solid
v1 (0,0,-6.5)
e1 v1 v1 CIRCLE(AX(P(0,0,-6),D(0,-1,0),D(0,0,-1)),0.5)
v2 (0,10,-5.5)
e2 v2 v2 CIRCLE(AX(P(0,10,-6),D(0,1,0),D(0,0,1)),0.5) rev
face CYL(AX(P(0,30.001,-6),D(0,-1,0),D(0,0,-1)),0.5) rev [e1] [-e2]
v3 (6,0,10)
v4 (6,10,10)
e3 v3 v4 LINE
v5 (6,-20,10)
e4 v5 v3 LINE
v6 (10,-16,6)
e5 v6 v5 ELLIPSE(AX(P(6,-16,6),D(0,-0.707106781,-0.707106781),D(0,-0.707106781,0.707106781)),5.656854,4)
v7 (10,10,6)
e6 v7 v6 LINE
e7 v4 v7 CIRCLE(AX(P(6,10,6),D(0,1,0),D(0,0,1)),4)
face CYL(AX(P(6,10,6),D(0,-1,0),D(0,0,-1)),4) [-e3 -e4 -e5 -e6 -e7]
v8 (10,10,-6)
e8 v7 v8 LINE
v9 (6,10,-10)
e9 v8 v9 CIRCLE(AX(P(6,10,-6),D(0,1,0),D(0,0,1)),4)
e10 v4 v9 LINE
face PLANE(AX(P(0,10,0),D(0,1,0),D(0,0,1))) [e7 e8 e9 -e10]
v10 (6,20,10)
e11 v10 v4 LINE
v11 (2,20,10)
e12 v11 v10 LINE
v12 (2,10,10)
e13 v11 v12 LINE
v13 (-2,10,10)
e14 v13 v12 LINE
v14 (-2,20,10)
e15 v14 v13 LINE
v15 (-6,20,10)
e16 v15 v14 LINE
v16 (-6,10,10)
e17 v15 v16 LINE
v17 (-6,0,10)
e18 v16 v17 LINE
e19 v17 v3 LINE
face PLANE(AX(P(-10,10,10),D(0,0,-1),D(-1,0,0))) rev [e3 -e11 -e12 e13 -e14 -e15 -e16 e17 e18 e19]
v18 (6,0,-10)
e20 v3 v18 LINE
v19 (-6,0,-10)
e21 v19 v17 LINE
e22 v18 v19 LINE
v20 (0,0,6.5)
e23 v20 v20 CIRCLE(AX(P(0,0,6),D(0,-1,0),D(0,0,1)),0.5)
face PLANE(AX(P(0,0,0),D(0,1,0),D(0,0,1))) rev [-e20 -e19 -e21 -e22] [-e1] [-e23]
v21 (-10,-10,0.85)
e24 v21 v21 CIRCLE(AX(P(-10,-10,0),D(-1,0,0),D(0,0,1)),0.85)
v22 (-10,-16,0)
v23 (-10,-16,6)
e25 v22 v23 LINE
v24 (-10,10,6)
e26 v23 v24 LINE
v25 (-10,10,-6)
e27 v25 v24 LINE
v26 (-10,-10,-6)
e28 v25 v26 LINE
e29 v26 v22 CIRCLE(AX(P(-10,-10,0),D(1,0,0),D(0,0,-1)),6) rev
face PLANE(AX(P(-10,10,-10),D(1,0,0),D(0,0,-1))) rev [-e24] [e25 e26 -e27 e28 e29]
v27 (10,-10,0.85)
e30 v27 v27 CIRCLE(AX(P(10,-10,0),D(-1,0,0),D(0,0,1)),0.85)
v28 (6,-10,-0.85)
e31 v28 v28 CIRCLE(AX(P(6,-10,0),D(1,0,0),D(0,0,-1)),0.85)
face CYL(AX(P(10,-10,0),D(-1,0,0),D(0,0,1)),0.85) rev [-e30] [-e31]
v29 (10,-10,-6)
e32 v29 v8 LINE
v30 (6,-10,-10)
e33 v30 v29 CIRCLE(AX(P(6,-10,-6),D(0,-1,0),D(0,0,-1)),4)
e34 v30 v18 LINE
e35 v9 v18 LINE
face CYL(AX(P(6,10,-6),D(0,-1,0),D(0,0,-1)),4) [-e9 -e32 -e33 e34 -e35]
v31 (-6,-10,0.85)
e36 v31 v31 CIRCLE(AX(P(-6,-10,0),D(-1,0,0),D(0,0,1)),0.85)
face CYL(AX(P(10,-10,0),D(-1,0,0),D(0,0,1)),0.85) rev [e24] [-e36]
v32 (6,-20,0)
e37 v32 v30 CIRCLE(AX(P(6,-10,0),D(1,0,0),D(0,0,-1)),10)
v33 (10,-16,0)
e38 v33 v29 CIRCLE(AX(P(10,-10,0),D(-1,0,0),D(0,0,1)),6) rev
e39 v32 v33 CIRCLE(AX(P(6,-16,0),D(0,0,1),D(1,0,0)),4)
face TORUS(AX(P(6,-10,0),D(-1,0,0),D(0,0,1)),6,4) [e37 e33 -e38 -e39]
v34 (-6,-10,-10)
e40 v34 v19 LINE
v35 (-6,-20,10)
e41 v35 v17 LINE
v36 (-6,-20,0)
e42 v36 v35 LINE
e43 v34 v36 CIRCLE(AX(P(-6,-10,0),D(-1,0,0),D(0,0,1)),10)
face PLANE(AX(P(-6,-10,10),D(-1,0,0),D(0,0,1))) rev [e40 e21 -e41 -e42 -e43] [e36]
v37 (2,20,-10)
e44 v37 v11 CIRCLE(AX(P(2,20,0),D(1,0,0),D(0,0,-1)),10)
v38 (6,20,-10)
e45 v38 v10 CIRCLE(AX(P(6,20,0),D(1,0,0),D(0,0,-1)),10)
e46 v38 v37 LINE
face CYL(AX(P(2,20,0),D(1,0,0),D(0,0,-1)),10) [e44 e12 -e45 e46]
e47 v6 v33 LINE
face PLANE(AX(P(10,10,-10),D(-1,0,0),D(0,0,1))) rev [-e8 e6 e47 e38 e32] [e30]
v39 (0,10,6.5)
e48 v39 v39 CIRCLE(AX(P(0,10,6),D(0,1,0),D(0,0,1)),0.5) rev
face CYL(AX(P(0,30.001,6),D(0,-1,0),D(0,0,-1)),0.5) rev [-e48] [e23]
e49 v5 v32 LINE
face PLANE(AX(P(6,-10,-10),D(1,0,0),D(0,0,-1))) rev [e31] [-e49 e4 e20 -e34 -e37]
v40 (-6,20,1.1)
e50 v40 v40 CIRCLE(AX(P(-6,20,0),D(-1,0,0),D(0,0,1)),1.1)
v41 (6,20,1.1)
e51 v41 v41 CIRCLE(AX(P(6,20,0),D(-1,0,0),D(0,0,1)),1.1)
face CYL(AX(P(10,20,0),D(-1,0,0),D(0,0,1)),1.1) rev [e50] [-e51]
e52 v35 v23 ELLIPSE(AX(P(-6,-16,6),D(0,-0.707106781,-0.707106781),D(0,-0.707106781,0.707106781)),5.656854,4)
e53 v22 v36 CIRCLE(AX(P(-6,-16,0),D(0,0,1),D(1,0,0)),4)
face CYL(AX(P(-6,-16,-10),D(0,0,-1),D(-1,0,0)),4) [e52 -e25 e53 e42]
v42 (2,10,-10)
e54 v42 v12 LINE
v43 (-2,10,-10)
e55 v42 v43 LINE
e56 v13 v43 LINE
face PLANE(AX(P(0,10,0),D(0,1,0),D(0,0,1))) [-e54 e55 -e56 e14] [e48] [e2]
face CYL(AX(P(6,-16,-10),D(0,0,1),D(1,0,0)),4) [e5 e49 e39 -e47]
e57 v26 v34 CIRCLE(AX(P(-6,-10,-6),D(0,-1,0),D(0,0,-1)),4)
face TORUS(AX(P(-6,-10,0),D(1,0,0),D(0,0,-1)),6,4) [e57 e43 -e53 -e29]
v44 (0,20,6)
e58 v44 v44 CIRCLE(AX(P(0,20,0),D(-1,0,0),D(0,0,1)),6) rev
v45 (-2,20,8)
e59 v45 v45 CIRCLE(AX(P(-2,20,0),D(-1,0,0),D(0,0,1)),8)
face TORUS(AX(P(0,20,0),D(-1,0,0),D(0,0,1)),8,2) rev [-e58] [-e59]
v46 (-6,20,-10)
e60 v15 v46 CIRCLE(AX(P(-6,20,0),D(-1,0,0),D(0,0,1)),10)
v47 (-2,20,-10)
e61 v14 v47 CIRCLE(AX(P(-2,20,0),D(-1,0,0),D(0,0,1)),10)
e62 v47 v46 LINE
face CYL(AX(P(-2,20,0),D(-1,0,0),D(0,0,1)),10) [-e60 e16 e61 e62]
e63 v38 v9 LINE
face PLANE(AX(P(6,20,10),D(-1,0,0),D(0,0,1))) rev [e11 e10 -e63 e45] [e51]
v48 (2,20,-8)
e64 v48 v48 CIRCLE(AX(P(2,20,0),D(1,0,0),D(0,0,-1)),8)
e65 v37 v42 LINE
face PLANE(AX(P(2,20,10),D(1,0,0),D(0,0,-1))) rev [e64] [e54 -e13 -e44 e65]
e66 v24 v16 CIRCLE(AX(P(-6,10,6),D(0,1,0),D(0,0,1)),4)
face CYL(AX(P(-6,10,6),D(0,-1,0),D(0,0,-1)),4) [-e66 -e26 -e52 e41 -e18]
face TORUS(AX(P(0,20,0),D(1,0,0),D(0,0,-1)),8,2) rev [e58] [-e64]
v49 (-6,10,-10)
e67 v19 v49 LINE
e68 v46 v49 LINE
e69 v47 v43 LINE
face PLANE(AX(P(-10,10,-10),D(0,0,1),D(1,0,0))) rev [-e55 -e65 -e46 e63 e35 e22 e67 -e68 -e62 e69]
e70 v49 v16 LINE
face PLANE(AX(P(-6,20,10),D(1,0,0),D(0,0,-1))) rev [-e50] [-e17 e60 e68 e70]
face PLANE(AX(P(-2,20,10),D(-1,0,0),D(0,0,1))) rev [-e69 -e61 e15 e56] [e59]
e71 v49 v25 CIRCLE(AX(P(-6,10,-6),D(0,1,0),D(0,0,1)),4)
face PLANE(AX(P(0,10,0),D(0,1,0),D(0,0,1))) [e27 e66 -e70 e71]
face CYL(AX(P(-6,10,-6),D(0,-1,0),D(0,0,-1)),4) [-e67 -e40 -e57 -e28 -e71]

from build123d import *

# Parameters (mm, degrees)
SKETCH1_W           = 20
SKETCH1_H           = 20
BOSS_EXTRUDE1_DEPTH = 10
SKETCH4_W           = 4
SKETCH4_H           = 20
BOSS_EXTRUDE2_DEPTH = 10
BOSS_EXTRUDE3_DEPTH = 4
BOSS_EXTRUDE4_START = -4
BOSS_EXTRUDE4_DEPTH = 4
SKETCH7_R           = 0.85
CUT_EXTRUDE1_DEPTH  = 31
FILLET1_R           = 4
SKETCH8_W           = 4
SKETCH8_H           = 20
BOSS_EXTRUDE5_DEPTH = 10
SKETCH9_R           = 10
BOSS_EXTRUDE6_DEPTH = 4
BOSS_EXTRUDE7_START = -4
SKETCH10_R          = 10
BOSS_EXTRUDE7_DEPTH = 4
SKETCH12_R          = 1.1
CUT_EXTRUDE2_DEPTH  = 36.440090293
SKETCH13_R          = 6
BOSS_EXTRUDE8_DEPTH = 4
SKETCH14_R          = 1.1
CUT_EXTRUDE3_DEPTH  = 4
FILLET2_R           = 2
CUT_EXTRUDE4_REACH  = 35.166
SKETCH16_R          = 0.5


with BuildPart() as part:
    # Sketch1 → Boss-Extrude1 (new body)
    with BuildSketch(Plane(origin=(0, 0, 0), x_dir=(1, 0, 0), z_dir=(0, 1, 0))):
        Rectangle(SKETCH1_W, SKETCH1_H)
    extrude(amount=BOSS_EXTRUDE1_DEPTH)

    # Sketch4 → Boss-Extrude2 (add)
    with BuildSketch(Plane.XZ):
        with Locations((-8, 0)):
            Rectangle(SKETCH4_W, SKETCH4_H)
        with Locations((8, 0)):
            Rectangle(SKETCH4_W, SKETCH4_H)
    extrude(amount=BOSS_EXTRUDE2_DEPTH)

    # Sketch5 → Boss-Extrude3 (add)
    with BuildSketch(Plane.ZY.offset(10)):
        with BuildLine():
            Line((0, -20), (10, -20))
            Line((10, -20), (10, -10))
            ThreePointArc((10, -10), (-7.071067812, -2.928932188), (0, -20))
        make_face()
    extrude(amount=-BOSS_EXTRUDE3_DEPTH)

    # Sketch6 → Boss-Extrude4 (add)
    with BuildSketch(Plane(origin=(10, 0, 0), x_dir=(0, 0, -1), z_dir=(1, 0, 0)).offset(BOSS_EXTRUDE4_START)):
        with BuildLine():
            Line((0, -20), (-10, -20))
            Line((-10, -20), (-10, -10))
            ThreePointArc((-10, -10), (7.071067812, -2.928932188), (0, -20))
        make_face()
    extrude(amount=BOSS_EXTRUDE4_DEPTH)

    # Sketch7 → Cut-Extrude1 (cut, through all)
    with BuildSketch(Plane.ZY.offset(10)):
        with Locations((0, -10)):
            Circle(SKETCH7_R)
    extrude(amount=-CUT_EXTRUDE1_DEPTH, mode=Mode.SUBTRACT)

    # Fillet1
    fillet1_edges = [part.edges().sort_by_distance(p)[0] for p in [
        (-10, -5, 10),
        (-10, -17.071067812, -7.071067812),
        (10, -5, 10),
        (10, -17.071067812, -7.071067812),
        (-10, 0, -10),
        (10, 0, -10),
        (10, -20, 5),
        (-10, -20, 5),
    ]]
    fillet(fillet1_edges, radius=FILLET1_R - 0.0001)  # a hair under: the kernel refuses the full size

    # Sketch8 → Boss-Extrude5 (add)
    with BuildSketch(Plane(origin=(0, 10, 0), x_dir=(1, 0, 0), z_dir=(0, 1, 0))):
        with Locations((4, 0)):
            Rectangle(SKETCH8_W, SKETCH8_H)
        with Locations((-4, 0)):
            Rectangle(SKETCH8_W, SKETCH8_H)
    extrude(amount=BOSS_EXTRUDE5_DEPTH)

    # Sketch9 → Boss-Extrude6 (add)
    with BuildSketch(Plane(origin=(6, 0, 0), x_dir=(0, 0, -1), z_dir=(1, 0, 0))):
        with Locations((0, 20)):
            Circle(SKETCH9_R)
    extrude(amount=-BOSS_EXTRUDE6_DEPTH)

    # Sketch10 → Boss-Extrude7 (add)
    with BuildSketch(Plane.ZY.offset(6).offset(BOSS_EXTRUDE7_START)):
        with Locations((0, 20)):
            Circle(SKETCH10_R)
    extrude(amount=BOSS_EXTRUDE7_DEPTH)

    # Sketch12 → Cut-Extrude2 (cut, through all)
    with BuildSketch(Plane.ZY.offset(6)):
        with Locations((0, 20)):
            Circle(SKETCH12_R)
    extrude(amount=-CUT_EXTRUDE2_DEPTH, mode=Mode.SUBTRACT)

    # Sketch13 → Boss-Extrude8 (add)
    with BuildSketch(Plane(origin=(-2, 0, 0), x_dir=(0, 0, -1), z_dir=(1, 0, 0))):
        with Locations(Location((0, 20, 0), (0, 0, 180))):
            Circle(SKETCH13_R)
    extrude(amount=BOSS_EXTRUDE8_DEPTH)

    # Sketch14 → Cut-Extrude3 (cut)
    with BuildSketch(Plane(origin=(-2, 0, 0), x_dir=(0, 0, -1), z_dir=(1, 0, 0))):
        with Locations(Location((0, 20, 0), (0, 0, 180))):
            Circle(SKETCH14_R)
    extrude(amount=CUT_EXTRUDE3_DEPTH, mode=Mode.SUBTRACT)

    # Fillet2
    fillet2_edges = [part.edges().sort_by_distance(p)[0] for p in [
        (-2, 20, -6),
        (2, 20, -6),
    ]]
    fillet(fillet2_edges, radius=FILLET2_R - 0.0001)  # a hair under: the kernel refuses the full size

    # Sketch16 → Cut-Extrude4 (cut, up to next)
    with BuildSketch(Plane.XZ, mode=Mode.PRIVATE) as cut_extrude4_sk1:
        with Locations(Location((0, -6, 0), (0, 0, 270))):
            Circle(SKETCH16_R)
    cut_extrude4_tool1 = extrude(cut_extrude4_sk1.sketch, amount=-CUT_EXTRUDE4_REACH, mode=Mode.PRIVATE) & part.part
    # Sketch16 → Cut-Extrude4 (cut, up to next)
    with BuildSketch(Plane.XZ, mode=Mode.PRIVATE) as cut_extrude4_sk2:
        with Locations(Location((0, 6, 0), (0, 0, 90))):
            Circle(SKETCH16_R)
    cut_extrude4_tool2 = extrude(cut_extrude4_sk2.sketch, amount=-CUT_EXTRUDE4_REACH, mode=Mode.PRIVATE) & part.part
    add(cut_extrude4_tool1.solids().sort_by_distance((0, 0, -6))[0], mode=Mode.SUBTRACT)
    add(cut_extrude4_tool2.solids().sort_by_distance((0, 0, 6))[0], mode=Mode.SUBTRACT)


solid = part.part
